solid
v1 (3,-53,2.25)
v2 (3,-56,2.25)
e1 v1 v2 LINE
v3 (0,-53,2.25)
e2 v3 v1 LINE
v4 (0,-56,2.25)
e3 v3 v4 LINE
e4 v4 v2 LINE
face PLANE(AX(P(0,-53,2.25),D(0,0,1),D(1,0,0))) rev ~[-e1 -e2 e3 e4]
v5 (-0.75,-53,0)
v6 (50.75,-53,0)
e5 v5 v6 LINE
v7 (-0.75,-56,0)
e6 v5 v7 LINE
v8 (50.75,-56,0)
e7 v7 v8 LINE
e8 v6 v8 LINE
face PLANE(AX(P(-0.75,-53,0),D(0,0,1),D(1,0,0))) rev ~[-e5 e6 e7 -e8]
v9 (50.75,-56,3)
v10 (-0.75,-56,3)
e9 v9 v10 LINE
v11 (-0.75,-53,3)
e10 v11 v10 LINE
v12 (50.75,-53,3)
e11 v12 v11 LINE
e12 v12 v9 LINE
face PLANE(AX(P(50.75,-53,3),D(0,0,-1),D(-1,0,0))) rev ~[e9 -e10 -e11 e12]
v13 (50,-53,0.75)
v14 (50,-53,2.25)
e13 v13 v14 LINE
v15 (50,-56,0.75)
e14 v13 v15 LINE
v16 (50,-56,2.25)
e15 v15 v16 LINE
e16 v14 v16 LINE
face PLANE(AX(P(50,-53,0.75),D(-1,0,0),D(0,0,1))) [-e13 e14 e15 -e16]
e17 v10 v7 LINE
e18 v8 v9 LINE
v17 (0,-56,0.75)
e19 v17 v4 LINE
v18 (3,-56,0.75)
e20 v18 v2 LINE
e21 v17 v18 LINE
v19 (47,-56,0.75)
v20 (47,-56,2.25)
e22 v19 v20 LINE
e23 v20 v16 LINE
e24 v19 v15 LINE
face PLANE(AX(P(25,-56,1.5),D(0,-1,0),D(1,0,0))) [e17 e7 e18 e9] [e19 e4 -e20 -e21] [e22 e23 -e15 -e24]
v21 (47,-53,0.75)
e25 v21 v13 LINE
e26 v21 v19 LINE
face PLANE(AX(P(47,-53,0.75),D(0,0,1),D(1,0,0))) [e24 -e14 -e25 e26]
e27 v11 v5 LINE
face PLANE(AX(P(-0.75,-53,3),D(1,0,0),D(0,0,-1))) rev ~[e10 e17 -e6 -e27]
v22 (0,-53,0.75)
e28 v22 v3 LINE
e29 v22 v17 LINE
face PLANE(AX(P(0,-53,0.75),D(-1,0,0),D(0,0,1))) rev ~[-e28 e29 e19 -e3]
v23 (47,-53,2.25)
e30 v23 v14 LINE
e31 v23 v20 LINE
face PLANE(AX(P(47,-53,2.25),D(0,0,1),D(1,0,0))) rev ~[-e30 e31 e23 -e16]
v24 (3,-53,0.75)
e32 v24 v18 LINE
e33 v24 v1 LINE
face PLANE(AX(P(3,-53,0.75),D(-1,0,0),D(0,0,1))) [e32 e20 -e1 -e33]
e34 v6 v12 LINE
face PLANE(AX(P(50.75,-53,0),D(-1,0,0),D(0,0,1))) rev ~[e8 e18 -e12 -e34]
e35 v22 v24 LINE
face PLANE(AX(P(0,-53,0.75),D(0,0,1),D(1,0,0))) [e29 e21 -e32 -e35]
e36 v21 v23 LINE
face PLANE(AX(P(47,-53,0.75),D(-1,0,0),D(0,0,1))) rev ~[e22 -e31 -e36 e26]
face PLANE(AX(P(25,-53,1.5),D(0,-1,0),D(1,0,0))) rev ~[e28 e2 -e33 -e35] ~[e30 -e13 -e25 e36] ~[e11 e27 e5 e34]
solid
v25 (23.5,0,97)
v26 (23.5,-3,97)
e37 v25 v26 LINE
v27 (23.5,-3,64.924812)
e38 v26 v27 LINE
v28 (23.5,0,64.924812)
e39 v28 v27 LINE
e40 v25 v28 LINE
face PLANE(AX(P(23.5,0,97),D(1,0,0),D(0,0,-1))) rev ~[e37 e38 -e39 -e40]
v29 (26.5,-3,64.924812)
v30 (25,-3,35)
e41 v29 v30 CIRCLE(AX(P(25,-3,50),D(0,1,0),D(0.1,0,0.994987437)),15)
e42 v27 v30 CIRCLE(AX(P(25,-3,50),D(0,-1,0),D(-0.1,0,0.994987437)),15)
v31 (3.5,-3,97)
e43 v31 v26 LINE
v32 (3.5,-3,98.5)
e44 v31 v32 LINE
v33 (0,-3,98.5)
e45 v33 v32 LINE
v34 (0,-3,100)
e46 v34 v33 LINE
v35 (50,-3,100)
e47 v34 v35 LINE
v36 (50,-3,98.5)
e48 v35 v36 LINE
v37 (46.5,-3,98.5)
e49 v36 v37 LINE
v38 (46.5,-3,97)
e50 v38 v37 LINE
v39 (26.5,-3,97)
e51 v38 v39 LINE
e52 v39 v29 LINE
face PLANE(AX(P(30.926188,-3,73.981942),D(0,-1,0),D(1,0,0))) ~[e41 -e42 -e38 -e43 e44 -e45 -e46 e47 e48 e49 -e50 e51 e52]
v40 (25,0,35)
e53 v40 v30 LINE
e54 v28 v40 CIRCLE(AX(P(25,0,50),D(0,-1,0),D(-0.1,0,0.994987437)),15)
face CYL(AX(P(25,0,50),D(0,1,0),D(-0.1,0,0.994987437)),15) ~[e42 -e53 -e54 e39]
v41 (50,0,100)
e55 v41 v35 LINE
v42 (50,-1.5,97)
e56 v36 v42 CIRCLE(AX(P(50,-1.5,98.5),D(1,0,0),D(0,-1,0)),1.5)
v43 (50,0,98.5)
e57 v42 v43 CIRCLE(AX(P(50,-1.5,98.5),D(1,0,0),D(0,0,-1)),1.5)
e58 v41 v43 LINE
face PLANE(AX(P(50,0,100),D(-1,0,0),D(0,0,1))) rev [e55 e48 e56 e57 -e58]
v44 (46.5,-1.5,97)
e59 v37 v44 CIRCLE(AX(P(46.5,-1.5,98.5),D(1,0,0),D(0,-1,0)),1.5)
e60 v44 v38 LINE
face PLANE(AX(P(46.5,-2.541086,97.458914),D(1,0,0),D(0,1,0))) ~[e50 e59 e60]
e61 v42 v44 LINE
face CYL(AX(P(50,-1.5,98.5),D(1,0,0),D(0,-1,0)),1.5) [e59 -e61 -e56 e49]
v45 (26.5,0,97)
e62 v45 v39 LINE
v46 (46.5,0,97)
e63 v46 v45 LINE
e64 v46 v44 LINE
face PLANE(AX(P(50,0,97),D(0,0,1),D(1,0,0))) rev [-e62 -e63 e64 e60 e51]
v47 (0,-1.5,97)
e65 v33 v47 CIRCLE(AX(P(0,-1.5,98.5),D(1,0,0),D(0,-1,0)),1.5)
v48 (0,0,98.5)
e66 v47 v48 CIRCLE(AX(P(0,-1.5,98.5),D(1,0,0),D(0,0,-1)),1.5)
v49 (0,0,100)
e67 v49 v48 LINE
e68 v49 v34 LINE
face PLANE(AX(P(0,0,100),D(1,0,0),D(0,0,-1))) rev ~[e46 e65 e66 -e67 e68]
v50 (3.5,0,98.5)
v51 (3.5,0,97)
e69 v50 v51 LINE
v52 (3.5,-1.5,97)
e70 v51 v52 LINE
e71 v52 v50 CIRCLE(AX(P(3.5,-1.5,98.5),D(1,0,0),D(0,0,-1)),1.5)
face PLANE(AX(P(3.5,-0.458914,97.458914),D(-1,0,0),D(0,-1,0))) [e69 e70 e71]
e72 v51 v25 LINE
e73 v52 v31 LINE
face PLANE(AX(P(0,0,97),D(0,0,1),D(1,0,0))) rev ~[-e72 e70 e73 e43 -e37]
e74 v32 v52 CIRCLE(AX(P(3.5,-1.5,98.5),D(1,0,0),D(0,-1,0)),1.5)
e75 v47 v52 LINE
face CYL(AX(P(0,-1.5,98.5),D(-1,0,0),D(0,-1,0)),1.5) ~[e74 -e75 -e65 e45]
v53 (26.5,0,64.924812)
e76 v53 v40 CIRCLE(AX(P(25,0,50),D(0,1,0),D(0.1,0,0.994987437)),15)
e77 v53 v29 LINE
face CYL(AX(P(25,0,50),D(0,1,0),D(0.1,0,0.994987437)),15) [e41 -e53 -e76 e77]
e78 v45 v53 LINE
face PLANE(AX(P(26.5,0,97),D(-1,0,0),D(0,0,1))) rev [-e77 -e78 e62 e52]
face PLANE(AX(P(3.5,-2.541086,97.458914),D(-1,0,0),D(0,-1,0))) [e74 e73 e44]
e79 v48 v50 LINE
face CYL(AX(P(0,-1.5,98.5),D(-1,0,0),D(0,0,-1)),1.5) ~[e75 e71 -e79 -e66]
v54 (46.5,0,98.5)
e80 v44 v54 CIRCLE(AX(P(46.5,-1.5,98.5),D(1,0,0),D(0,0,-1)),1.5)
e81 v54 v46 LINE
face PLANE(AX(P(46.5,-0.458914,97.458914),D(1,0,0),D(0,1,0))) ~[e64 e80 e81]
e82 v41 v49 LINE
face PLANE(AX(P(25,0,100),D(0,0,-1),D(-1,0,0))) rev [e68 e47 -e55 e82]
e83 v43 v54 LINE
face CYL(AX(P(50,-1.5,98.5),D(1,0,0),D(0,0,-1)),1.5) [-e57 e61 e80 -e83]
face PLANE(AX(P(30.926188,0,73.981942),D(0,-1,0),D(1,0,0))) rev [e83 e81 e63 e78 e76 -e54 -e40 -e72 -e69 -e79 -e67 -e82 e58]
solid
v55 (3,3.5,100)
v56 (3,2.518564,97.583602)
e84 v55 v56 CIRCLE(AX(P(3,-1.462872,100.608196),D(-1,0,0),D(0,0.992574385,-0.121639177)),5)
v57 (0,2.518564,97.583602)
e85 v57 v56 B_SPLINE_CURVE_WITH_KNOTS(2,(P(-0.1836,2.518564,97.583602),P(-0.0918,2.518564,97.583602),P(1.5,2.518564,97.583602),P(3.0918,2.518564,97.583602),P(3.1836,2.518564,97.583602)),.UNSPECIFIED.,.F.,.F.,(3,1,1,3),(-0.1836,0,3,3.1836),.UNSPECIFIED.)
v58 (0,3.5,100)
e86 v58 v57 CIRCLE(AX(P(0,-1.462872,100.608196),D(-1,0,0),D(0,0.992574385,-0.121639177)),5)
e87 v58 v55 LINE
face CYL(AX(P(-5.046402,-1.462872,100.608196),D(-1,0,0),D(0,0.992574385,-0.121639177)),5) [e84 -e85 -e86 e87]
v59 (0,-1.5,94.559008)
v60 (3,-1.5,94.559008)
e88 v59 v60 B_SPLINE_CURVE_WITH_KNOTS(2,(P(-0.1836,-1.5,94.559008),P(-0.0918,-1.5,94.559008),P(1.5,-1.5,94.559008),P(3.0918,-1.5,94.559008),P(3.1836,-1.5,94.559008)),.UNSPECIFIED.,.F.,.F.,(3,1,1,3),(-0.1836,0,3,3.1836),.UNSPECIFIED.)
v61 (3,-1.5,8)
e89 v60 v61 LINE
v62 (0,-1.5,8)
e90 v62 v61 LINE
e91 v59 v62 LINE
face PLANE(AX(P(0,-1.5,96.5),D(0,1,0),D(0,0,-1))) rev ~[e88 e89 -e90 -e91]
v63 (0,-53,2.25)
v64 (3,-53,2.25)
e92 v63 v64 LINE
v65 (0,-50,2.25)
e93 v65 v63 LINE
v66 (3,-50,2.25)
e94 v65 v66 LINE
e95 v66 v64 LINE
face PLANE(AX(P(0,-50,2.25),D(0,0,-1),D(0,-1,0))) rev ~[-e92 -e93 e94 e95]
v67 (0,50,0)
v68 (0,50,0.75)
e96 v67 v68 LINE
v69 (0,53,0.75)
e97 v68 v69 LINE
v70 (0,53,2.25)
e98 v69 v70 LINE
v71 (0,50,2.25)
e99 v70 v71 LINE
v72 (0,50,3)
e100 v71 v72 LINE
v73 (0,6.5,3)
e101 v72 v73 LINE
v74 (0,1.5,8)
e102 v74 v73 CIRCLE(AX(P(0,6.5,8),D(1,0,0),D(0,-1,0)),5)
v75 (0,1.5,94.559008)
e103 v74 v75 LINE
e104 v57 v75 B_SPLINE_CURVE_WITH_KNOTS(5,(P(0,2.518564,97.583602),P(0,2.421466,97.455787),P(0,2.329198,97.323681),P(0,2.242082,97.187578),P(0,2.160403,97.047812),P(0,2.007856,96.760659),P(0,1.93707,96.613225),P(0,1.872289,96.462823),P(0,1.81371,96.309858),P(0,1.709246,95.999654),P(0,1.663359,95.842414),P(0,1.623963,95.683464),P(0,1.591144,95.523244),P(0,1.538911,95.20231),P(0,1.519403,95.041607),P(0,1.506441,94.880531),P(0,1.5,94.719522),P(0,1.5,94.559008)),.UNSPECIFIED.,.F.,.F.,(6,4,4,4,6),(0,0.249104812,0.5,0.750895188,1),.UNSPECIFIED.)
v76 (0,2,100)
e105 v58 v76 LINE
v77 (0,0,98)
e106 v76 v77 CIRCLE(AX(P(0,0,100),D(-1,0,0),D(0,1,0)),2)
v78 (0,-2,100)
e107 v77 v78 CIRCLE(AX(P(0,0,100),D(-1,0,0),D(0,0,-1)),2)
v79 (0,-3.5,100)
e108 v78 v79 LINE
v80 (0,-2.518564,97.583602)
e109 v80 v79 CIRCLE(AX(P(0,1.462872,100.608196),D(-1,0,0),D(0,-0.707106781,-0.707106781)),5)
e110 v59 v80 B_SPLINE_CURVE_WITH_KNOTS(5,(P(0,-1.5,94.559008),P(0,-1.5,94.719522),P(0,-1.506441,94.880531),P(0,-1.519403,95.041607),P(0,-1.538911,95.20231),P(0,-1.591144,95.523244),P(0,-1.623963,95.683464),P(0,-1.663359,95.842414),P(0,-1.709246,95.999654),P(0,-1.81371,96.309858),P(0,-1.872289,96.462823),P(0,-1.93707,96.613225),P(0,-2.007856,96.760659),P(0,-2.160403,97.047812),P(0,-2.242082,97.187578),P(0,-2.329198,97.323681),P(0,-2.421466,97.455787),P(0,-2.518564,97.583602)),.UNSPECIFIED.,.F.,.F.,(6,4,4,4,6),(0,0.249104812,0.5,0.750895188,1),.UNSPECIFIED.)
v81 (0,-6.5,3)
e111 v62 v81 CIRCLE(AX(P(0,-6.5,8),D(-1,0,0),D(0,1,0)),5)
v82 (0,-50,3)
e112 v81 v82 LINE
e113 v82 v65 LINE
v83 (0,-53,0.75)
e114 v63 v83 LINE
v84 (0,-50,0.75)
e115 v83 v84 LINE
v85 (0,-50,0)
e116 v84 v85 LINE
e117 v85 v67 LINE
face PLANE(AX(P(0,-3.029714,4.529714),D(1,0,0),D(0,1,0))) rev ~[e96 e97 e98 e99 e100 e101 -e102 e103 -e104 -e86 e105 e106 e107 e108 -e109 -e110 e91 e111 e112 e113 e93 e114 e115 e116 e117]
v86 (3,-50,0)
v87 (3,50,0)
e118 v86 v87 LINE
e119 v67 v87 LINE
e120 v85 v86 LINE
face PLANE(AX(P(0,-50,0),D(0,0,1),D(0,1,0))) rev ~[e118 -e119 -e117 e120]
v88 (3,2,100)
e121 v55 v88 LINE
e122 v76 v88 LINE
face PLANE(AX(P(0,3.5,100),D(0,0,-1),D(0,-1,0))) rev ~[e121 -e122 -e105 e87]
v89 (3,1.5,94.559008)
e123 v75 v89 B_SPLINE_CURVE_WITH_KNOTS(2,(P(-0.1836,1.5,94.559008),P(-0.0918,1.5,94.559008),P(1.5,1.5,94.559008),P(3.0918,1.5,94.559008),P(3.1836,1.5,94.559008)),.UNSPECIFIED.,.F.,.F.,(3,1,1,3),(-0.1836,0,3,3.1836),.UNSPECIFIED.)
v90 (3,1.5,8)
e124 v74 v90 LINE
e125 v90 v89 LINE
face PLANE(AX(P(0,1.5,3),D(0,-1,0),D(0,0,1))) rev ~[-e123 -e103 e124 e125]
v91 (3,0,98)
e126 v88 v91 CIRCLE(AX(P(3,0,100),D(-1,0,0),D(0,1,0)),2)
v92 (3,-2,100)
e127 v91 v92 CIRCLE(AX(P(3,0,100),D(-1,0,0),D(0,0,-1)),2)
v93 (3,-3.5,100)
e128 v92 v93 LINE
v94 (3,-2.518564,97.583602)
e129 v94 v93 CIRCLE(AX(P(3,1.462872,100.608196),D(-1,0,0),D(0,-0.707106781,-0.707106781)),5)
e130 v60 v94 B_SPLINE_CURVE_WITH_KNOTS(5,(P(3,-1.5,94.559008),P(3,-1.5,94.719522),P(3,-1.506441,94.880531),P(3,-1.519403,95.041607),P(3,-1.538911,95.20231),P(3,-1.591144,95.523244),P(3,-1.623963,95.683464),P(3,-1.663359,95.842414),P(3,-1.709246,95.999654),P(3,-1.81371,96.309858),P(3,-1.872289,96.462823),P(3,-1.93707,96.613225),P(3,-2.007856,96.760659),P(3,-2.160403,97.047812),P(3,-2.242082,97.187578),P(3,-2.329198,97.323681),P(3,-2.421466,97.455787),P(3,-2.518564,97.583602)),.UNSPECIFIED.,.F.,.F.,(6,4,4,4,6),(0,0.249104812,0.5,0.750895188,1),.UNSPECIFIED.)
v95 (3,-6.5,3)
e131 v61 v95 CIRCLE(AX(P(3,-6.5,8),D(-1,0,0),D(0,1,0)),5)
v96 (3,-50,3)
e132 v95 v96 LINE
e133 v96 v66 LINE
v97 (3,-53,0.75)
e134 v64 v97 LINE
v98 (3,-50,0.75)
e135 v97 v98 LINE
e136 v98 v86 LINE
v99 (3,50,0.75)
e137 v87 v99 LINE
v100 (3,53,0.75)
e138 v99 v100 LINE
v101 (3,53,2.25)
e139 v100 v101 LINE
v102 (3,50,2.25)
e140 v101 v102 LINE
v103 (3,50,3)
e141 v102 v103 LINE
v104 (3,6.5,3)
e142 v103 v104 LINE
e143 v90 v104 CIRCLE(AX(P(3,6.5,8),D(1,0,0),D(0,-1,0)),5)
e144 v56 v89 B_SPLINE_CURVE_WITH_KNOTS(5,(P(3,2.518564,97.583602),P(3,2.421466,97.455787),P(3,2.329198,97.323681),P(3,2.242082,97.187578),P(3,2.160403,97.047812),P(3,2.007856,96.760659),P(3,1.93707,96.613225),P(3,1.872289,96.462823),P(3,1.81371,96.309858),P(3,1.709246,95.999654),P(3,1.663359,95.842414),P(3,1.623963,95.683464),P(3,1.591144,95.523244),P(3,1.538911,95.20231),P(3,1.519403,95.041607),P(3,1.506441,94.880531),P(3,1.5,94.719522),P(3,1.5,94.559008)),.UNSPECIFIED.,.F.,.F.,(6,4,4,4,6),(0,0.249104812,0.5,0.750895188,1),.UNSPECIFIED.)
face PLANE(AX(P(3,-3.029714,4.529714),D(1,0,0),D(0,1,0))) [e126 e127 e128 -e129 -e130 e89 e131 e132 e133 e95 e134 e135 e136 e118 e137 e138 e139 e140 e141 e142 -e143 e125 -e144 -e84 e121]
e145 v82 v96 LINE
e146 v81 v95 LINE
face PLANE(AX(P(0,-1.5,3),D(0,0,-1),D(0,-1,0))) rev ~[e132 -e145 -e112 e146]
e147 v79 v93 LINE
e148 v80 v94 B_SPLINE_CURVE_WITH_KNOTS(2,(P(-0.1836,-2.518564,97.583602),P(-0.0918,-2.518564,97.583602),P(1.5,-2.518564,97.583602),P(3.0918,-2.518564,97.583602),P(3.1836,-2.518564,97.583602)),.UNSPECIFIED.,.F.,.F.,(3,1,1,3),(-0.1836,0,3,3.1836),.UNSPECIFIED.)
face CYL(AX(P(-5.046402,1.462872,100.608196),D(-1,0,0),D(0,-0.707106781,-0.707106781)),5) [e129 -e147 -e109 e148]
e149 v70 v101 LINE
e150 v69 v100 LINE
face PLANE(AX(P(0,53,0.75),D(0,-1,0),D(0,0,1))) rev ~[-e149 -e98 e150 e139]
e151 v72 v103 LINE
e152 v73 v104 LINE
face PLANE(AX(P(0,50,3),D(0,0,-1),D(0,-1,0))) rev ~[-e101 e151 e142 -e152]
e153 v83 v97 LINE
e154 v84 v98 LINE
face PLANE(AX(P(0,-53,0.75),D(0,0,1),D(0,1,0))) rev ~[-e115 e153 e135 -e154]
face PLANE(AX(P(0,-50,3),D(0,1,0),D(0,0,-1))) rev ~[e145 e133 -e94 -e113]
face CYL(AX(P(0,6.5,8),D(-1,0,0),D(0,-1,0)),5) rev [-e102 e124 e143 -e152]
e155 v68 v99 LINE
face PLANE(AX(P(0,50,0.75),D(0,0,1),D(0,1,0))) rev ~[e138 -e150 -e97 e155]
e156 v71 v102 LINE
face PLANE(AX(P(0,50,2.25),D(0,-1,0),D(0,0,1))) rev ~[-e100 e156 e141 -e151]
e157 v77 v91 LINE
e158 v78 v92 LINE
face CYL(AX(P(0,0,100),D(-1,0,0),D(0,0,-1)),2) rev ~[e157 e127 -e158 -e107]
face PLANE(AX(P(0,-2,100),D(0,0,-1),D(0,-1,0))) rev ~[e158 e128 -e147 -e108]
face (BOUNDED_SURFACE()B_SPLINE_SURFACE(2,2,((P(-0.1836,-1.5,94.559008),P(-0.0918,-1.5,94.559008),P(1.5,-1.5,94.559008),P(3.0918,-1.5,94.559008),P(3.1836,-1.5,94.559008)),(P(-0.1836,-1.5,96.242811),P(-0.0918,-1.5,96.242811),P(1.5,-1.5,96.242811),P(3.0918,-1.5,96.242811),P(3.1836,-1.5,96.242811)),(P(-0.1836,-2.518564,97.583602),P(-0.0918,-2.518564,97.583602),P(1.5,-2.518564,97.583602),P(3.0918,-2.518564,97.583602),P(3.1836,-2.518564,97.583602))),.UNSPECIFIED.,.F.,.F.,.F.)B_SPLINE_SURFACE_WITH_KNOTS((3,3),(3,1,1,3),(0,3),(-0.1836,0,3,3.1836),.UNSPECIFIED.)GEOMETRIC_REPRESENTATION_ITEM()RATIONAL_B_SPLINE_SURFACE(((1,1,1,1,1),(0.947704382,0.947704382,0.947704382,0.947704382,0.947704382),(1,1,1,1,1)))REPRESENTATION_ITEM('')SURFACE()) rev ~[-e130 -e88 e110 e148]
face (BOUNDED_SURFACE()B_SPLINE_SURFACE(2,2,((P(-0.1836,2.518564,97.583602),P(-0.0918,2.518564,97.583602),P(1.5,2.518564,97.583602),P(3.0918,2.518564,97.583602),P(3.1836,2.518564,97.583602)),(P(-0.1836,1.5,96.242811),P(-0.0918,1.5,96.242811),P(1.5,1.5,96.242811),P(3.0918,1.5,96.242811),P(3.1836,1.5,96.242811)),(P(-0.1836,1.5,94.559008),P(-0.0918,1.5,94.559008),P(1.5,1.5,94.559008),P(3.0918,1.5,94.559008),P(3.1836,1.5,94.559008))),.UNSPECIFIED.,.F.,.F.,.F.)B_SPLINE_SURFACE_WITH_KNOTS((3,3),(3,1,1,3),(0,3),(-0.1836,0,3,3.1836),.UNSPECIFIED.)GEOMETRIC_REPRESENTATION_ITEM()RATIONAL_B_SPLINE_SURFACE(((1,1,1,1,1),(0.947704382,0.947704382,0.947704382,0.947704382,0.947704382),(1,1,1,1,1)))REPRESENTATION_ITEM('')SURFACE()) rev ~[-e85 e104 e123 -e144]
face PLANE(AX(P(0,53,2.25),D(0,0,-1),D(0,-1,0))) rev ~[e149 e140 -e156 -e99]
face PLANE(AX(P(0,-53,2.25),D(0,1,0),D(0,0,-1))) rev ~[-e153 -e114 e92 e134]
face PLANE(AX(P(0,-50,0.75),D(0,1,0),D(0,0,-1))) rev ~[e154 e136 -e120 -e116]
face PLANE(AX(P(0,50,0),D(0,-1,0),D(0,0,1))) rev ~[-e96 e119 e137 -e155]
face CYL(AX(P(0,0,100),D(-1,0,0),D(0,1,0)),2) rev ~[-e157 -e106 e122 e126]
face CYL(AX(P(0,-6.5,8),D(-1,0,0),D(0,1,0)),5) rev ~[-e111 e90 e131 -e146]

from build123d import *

# Parameters (mm, degrees)
F1_DEPTH    = 3
F2_T1_DEPTH = 3
F2_T3_DEPTH = 3
F2_T5_DEPTH = 13.0928039389
F2_T7_DEPTH = 13.0928039389
F3_R        = 5
F4_W        = 3
F4_H        = 1.5
F5_DEPTH    = 3
F7_DEPTH    = 3
F9_DEPTH    = 3.5


# Not quite as in the source:
# - a fillet or chamfer that OpenCascade refuses, or shapes differently, is made with other operations: its cross-section is extruded or revolved along the edge and cut away or added


with BuildPart() as f1:
    # F0 (on Right) → F1 (new body)
    with BuildSketch(Plane.YZ):
        with BuildLine():
            ThreePointArc((0, 98), (-1.4142135624, 98.5857864376), (-2, 100))
            Line((-2, 100), (-3.5, 100))
            Line((-3.5, 100), (-3.5, 98.5))
            Line((-3.5, 98.5), (-1.5, 96.5))
            Line((-1.5, 96.5), (-1.5, 3))
            Line((-1.5, 3), (-50, 3))
            Line((-50, 3), (-50, 2.25))
            Line((-50, 2.25), (-53, 2.25))
            Line((-53, 2.25), (-53, 0.75))
            Line((-53, 0.75), (-50, 0.75))
            Line((-50, 0.75), (-50, 0))
            Line((-50, 0), (0, 0))
            Line((0, 0), (50, 0))
            Line((50, 0), (50, 0.75))
            Line((50, 0.75), (53, 0.75))
            Line((53, 0.75), (53, 2.25))
            Line((53, 2.25), (50, 2.25))
            Line((50, 2.25), (50, 3))
            Line((50, 3), (1.5, 3))
            Line((1.5, 3), (1.5, 96.5))
            Line((1.5, 96.5), (3.5, 98.5))
            Line((3.5, 98.5), (3.5, 100))
            Line((3.5, 100), (2, 100))
            ThreePointArc((2, 100), (1.4142135624, 98.5857864376), (0, 98))
        make_face()
    extrude(amount=F1_DEPTH)

    # F2: fillet of radius 5 on 4 edges, made by hand

    # F2_s2 → F2_t1 (join)
    with BuildSketch(Plane.YZ):
        with BuildLine():
            ThreePointArc((1.5, 8), (2.9644660941, 4.4644660941), (6.5, 3))
            Line((6.5, 3), (1.5, 3))
            Line((1.5, 3), (1.5, 8))
        make_face()
    extrude(amount=F2_T1_DEPTH)

    # F2_s4 → F2_t3 (join)
    with BuildSketch(Plane.YZ):
        with BuildLine():
            ThreePointArc((-1.5, 8), (-2.9644660941, 4.4644660941), (-6.5, 3))
            Line((-6.5, 3), (-1.5, 3))
            Line((-1.5, 3), (-1.5, 8))
        make_face()
    extrude(amount=F2_T3_DEPTH)

    # F2_s6 → F2_t5 (cut)
    with BuildSketch(Plane.YZ.offset(-5.0464019695)):
        with BuildLine():
            ThreePointArc((3.5, 100), (3.0313524106, 98.4168612226), (2.0726619787, 97.0726619787))
            Line((2.0726619787, 97.0726619787), (3.5, 98.5))
            Line((3.5, 98.5), (3.5, 100))
        make_face()
    extrude(amount=F2_T5_DEPTH, mode=Mode.SUBTRACT)

    # F2_s8 → F2_t7 (cut)
    with BuildSketch(Plane.YZ.offset(-5.0464019695)):
        with BuildLine():
            ThreePointArc((-2.0726619787, 97.0726619787), (-3.0313524106, 98.4168612226), (-3.5, 100))
            Line((-3.5, 100), (-3.5, 98.5))
            Line((-3.5, 98.5), (-2.0726619787, 97.0726619787))
        make_face()
    extrude(amount=F2_T7_DEPTH, mode=Mode.SUBTRACT)

    # F3
    f3_edges = [f1.edges().sort_by_distance(p)[0] for p in [
        (1.5, -1.5, 96.5),
        (1.5, 1.5, 96.5),
    ]]
    fillet(f3_edges, radius=F3_R)


with BuildPart() as f5:
    # F4 (on face) → F5 (new body)
    with BuildSketch(Plane.XZ.offset(53)):
        Polygon((-0.75, 0), (0, 0), (25, 0), (50, 0), (50.75, 0), (50.75, 3), (50, 3), (47, 3), (25, 3), (3, 3), (0, 3), (-0.75, 3), align=None)
        with Locations((1.5, 1.5)):
            Rectangle(F4_W, F4_H, mode=Mode.SUBTRACT)
        with Locations((48.5, 1.5)):
            Rectangle(F4_W, F4_H, mode=Mode.SUBTRACT)
    extrude(amount=F5_DEPTH)


with BuildPart() as f7:
    # F6 (on Front) → F7 (new body)
    with BuildSketch(Plane.XZ):
        with BuildLine():
            Line((25, 64.9248115566), (25, 100))
            Line((25, 100), (0, 100))
            Line((0, 100), (0, 97))
            Line((0, 97), (23.5, 97))
            Line((23.5, 97), (23.5, 64.9248115566))
            ThreePointArc((23.5, 64.9248115566), (10.0188089033, 49.2490583741), (25, 35))
            Line((25, 35), (25, 64.9248115566))
        make_face()
    extrude(amount=F7_DEPTH)

    # F8 (on face) → F9 (cut)
    with BuildSketch(Plane(origin=(0, 0, 0), x_dir=(0, -1, 0), z_dir=(-1, 0, 0))):
        with BuildLine():
            Line((3, 97), (3, 98.5))
            ThreePointArc((3, 98.5), (2.5606601718, 97.4393398282), (1.5, 97))
            Line((1.5, 97), (3, 97))
        make_face()
        with BuildLine():
            Line((0, 97), (1.5, 97))
            ThreePointArc((1.5, 97), (0.4393398282, 97.4393398282), (0, 98.5))
            Line((0, 98.5), (0, 97))
        make_face()
    extrude(amount=-F9_DEPTH, mode=Mode.SUBTRACT)

    # F10: F7 across face


with BuildPart() as f7_1:
    add(f7.part)
    add(f7.part.mirror(Plane(origin=(25, -1.5, 67.5), x_dir=(0, 1, 0), z_dir=(1, 0, 0))))


solid = Compound([f1.part, f5.part, f7_1.part])
